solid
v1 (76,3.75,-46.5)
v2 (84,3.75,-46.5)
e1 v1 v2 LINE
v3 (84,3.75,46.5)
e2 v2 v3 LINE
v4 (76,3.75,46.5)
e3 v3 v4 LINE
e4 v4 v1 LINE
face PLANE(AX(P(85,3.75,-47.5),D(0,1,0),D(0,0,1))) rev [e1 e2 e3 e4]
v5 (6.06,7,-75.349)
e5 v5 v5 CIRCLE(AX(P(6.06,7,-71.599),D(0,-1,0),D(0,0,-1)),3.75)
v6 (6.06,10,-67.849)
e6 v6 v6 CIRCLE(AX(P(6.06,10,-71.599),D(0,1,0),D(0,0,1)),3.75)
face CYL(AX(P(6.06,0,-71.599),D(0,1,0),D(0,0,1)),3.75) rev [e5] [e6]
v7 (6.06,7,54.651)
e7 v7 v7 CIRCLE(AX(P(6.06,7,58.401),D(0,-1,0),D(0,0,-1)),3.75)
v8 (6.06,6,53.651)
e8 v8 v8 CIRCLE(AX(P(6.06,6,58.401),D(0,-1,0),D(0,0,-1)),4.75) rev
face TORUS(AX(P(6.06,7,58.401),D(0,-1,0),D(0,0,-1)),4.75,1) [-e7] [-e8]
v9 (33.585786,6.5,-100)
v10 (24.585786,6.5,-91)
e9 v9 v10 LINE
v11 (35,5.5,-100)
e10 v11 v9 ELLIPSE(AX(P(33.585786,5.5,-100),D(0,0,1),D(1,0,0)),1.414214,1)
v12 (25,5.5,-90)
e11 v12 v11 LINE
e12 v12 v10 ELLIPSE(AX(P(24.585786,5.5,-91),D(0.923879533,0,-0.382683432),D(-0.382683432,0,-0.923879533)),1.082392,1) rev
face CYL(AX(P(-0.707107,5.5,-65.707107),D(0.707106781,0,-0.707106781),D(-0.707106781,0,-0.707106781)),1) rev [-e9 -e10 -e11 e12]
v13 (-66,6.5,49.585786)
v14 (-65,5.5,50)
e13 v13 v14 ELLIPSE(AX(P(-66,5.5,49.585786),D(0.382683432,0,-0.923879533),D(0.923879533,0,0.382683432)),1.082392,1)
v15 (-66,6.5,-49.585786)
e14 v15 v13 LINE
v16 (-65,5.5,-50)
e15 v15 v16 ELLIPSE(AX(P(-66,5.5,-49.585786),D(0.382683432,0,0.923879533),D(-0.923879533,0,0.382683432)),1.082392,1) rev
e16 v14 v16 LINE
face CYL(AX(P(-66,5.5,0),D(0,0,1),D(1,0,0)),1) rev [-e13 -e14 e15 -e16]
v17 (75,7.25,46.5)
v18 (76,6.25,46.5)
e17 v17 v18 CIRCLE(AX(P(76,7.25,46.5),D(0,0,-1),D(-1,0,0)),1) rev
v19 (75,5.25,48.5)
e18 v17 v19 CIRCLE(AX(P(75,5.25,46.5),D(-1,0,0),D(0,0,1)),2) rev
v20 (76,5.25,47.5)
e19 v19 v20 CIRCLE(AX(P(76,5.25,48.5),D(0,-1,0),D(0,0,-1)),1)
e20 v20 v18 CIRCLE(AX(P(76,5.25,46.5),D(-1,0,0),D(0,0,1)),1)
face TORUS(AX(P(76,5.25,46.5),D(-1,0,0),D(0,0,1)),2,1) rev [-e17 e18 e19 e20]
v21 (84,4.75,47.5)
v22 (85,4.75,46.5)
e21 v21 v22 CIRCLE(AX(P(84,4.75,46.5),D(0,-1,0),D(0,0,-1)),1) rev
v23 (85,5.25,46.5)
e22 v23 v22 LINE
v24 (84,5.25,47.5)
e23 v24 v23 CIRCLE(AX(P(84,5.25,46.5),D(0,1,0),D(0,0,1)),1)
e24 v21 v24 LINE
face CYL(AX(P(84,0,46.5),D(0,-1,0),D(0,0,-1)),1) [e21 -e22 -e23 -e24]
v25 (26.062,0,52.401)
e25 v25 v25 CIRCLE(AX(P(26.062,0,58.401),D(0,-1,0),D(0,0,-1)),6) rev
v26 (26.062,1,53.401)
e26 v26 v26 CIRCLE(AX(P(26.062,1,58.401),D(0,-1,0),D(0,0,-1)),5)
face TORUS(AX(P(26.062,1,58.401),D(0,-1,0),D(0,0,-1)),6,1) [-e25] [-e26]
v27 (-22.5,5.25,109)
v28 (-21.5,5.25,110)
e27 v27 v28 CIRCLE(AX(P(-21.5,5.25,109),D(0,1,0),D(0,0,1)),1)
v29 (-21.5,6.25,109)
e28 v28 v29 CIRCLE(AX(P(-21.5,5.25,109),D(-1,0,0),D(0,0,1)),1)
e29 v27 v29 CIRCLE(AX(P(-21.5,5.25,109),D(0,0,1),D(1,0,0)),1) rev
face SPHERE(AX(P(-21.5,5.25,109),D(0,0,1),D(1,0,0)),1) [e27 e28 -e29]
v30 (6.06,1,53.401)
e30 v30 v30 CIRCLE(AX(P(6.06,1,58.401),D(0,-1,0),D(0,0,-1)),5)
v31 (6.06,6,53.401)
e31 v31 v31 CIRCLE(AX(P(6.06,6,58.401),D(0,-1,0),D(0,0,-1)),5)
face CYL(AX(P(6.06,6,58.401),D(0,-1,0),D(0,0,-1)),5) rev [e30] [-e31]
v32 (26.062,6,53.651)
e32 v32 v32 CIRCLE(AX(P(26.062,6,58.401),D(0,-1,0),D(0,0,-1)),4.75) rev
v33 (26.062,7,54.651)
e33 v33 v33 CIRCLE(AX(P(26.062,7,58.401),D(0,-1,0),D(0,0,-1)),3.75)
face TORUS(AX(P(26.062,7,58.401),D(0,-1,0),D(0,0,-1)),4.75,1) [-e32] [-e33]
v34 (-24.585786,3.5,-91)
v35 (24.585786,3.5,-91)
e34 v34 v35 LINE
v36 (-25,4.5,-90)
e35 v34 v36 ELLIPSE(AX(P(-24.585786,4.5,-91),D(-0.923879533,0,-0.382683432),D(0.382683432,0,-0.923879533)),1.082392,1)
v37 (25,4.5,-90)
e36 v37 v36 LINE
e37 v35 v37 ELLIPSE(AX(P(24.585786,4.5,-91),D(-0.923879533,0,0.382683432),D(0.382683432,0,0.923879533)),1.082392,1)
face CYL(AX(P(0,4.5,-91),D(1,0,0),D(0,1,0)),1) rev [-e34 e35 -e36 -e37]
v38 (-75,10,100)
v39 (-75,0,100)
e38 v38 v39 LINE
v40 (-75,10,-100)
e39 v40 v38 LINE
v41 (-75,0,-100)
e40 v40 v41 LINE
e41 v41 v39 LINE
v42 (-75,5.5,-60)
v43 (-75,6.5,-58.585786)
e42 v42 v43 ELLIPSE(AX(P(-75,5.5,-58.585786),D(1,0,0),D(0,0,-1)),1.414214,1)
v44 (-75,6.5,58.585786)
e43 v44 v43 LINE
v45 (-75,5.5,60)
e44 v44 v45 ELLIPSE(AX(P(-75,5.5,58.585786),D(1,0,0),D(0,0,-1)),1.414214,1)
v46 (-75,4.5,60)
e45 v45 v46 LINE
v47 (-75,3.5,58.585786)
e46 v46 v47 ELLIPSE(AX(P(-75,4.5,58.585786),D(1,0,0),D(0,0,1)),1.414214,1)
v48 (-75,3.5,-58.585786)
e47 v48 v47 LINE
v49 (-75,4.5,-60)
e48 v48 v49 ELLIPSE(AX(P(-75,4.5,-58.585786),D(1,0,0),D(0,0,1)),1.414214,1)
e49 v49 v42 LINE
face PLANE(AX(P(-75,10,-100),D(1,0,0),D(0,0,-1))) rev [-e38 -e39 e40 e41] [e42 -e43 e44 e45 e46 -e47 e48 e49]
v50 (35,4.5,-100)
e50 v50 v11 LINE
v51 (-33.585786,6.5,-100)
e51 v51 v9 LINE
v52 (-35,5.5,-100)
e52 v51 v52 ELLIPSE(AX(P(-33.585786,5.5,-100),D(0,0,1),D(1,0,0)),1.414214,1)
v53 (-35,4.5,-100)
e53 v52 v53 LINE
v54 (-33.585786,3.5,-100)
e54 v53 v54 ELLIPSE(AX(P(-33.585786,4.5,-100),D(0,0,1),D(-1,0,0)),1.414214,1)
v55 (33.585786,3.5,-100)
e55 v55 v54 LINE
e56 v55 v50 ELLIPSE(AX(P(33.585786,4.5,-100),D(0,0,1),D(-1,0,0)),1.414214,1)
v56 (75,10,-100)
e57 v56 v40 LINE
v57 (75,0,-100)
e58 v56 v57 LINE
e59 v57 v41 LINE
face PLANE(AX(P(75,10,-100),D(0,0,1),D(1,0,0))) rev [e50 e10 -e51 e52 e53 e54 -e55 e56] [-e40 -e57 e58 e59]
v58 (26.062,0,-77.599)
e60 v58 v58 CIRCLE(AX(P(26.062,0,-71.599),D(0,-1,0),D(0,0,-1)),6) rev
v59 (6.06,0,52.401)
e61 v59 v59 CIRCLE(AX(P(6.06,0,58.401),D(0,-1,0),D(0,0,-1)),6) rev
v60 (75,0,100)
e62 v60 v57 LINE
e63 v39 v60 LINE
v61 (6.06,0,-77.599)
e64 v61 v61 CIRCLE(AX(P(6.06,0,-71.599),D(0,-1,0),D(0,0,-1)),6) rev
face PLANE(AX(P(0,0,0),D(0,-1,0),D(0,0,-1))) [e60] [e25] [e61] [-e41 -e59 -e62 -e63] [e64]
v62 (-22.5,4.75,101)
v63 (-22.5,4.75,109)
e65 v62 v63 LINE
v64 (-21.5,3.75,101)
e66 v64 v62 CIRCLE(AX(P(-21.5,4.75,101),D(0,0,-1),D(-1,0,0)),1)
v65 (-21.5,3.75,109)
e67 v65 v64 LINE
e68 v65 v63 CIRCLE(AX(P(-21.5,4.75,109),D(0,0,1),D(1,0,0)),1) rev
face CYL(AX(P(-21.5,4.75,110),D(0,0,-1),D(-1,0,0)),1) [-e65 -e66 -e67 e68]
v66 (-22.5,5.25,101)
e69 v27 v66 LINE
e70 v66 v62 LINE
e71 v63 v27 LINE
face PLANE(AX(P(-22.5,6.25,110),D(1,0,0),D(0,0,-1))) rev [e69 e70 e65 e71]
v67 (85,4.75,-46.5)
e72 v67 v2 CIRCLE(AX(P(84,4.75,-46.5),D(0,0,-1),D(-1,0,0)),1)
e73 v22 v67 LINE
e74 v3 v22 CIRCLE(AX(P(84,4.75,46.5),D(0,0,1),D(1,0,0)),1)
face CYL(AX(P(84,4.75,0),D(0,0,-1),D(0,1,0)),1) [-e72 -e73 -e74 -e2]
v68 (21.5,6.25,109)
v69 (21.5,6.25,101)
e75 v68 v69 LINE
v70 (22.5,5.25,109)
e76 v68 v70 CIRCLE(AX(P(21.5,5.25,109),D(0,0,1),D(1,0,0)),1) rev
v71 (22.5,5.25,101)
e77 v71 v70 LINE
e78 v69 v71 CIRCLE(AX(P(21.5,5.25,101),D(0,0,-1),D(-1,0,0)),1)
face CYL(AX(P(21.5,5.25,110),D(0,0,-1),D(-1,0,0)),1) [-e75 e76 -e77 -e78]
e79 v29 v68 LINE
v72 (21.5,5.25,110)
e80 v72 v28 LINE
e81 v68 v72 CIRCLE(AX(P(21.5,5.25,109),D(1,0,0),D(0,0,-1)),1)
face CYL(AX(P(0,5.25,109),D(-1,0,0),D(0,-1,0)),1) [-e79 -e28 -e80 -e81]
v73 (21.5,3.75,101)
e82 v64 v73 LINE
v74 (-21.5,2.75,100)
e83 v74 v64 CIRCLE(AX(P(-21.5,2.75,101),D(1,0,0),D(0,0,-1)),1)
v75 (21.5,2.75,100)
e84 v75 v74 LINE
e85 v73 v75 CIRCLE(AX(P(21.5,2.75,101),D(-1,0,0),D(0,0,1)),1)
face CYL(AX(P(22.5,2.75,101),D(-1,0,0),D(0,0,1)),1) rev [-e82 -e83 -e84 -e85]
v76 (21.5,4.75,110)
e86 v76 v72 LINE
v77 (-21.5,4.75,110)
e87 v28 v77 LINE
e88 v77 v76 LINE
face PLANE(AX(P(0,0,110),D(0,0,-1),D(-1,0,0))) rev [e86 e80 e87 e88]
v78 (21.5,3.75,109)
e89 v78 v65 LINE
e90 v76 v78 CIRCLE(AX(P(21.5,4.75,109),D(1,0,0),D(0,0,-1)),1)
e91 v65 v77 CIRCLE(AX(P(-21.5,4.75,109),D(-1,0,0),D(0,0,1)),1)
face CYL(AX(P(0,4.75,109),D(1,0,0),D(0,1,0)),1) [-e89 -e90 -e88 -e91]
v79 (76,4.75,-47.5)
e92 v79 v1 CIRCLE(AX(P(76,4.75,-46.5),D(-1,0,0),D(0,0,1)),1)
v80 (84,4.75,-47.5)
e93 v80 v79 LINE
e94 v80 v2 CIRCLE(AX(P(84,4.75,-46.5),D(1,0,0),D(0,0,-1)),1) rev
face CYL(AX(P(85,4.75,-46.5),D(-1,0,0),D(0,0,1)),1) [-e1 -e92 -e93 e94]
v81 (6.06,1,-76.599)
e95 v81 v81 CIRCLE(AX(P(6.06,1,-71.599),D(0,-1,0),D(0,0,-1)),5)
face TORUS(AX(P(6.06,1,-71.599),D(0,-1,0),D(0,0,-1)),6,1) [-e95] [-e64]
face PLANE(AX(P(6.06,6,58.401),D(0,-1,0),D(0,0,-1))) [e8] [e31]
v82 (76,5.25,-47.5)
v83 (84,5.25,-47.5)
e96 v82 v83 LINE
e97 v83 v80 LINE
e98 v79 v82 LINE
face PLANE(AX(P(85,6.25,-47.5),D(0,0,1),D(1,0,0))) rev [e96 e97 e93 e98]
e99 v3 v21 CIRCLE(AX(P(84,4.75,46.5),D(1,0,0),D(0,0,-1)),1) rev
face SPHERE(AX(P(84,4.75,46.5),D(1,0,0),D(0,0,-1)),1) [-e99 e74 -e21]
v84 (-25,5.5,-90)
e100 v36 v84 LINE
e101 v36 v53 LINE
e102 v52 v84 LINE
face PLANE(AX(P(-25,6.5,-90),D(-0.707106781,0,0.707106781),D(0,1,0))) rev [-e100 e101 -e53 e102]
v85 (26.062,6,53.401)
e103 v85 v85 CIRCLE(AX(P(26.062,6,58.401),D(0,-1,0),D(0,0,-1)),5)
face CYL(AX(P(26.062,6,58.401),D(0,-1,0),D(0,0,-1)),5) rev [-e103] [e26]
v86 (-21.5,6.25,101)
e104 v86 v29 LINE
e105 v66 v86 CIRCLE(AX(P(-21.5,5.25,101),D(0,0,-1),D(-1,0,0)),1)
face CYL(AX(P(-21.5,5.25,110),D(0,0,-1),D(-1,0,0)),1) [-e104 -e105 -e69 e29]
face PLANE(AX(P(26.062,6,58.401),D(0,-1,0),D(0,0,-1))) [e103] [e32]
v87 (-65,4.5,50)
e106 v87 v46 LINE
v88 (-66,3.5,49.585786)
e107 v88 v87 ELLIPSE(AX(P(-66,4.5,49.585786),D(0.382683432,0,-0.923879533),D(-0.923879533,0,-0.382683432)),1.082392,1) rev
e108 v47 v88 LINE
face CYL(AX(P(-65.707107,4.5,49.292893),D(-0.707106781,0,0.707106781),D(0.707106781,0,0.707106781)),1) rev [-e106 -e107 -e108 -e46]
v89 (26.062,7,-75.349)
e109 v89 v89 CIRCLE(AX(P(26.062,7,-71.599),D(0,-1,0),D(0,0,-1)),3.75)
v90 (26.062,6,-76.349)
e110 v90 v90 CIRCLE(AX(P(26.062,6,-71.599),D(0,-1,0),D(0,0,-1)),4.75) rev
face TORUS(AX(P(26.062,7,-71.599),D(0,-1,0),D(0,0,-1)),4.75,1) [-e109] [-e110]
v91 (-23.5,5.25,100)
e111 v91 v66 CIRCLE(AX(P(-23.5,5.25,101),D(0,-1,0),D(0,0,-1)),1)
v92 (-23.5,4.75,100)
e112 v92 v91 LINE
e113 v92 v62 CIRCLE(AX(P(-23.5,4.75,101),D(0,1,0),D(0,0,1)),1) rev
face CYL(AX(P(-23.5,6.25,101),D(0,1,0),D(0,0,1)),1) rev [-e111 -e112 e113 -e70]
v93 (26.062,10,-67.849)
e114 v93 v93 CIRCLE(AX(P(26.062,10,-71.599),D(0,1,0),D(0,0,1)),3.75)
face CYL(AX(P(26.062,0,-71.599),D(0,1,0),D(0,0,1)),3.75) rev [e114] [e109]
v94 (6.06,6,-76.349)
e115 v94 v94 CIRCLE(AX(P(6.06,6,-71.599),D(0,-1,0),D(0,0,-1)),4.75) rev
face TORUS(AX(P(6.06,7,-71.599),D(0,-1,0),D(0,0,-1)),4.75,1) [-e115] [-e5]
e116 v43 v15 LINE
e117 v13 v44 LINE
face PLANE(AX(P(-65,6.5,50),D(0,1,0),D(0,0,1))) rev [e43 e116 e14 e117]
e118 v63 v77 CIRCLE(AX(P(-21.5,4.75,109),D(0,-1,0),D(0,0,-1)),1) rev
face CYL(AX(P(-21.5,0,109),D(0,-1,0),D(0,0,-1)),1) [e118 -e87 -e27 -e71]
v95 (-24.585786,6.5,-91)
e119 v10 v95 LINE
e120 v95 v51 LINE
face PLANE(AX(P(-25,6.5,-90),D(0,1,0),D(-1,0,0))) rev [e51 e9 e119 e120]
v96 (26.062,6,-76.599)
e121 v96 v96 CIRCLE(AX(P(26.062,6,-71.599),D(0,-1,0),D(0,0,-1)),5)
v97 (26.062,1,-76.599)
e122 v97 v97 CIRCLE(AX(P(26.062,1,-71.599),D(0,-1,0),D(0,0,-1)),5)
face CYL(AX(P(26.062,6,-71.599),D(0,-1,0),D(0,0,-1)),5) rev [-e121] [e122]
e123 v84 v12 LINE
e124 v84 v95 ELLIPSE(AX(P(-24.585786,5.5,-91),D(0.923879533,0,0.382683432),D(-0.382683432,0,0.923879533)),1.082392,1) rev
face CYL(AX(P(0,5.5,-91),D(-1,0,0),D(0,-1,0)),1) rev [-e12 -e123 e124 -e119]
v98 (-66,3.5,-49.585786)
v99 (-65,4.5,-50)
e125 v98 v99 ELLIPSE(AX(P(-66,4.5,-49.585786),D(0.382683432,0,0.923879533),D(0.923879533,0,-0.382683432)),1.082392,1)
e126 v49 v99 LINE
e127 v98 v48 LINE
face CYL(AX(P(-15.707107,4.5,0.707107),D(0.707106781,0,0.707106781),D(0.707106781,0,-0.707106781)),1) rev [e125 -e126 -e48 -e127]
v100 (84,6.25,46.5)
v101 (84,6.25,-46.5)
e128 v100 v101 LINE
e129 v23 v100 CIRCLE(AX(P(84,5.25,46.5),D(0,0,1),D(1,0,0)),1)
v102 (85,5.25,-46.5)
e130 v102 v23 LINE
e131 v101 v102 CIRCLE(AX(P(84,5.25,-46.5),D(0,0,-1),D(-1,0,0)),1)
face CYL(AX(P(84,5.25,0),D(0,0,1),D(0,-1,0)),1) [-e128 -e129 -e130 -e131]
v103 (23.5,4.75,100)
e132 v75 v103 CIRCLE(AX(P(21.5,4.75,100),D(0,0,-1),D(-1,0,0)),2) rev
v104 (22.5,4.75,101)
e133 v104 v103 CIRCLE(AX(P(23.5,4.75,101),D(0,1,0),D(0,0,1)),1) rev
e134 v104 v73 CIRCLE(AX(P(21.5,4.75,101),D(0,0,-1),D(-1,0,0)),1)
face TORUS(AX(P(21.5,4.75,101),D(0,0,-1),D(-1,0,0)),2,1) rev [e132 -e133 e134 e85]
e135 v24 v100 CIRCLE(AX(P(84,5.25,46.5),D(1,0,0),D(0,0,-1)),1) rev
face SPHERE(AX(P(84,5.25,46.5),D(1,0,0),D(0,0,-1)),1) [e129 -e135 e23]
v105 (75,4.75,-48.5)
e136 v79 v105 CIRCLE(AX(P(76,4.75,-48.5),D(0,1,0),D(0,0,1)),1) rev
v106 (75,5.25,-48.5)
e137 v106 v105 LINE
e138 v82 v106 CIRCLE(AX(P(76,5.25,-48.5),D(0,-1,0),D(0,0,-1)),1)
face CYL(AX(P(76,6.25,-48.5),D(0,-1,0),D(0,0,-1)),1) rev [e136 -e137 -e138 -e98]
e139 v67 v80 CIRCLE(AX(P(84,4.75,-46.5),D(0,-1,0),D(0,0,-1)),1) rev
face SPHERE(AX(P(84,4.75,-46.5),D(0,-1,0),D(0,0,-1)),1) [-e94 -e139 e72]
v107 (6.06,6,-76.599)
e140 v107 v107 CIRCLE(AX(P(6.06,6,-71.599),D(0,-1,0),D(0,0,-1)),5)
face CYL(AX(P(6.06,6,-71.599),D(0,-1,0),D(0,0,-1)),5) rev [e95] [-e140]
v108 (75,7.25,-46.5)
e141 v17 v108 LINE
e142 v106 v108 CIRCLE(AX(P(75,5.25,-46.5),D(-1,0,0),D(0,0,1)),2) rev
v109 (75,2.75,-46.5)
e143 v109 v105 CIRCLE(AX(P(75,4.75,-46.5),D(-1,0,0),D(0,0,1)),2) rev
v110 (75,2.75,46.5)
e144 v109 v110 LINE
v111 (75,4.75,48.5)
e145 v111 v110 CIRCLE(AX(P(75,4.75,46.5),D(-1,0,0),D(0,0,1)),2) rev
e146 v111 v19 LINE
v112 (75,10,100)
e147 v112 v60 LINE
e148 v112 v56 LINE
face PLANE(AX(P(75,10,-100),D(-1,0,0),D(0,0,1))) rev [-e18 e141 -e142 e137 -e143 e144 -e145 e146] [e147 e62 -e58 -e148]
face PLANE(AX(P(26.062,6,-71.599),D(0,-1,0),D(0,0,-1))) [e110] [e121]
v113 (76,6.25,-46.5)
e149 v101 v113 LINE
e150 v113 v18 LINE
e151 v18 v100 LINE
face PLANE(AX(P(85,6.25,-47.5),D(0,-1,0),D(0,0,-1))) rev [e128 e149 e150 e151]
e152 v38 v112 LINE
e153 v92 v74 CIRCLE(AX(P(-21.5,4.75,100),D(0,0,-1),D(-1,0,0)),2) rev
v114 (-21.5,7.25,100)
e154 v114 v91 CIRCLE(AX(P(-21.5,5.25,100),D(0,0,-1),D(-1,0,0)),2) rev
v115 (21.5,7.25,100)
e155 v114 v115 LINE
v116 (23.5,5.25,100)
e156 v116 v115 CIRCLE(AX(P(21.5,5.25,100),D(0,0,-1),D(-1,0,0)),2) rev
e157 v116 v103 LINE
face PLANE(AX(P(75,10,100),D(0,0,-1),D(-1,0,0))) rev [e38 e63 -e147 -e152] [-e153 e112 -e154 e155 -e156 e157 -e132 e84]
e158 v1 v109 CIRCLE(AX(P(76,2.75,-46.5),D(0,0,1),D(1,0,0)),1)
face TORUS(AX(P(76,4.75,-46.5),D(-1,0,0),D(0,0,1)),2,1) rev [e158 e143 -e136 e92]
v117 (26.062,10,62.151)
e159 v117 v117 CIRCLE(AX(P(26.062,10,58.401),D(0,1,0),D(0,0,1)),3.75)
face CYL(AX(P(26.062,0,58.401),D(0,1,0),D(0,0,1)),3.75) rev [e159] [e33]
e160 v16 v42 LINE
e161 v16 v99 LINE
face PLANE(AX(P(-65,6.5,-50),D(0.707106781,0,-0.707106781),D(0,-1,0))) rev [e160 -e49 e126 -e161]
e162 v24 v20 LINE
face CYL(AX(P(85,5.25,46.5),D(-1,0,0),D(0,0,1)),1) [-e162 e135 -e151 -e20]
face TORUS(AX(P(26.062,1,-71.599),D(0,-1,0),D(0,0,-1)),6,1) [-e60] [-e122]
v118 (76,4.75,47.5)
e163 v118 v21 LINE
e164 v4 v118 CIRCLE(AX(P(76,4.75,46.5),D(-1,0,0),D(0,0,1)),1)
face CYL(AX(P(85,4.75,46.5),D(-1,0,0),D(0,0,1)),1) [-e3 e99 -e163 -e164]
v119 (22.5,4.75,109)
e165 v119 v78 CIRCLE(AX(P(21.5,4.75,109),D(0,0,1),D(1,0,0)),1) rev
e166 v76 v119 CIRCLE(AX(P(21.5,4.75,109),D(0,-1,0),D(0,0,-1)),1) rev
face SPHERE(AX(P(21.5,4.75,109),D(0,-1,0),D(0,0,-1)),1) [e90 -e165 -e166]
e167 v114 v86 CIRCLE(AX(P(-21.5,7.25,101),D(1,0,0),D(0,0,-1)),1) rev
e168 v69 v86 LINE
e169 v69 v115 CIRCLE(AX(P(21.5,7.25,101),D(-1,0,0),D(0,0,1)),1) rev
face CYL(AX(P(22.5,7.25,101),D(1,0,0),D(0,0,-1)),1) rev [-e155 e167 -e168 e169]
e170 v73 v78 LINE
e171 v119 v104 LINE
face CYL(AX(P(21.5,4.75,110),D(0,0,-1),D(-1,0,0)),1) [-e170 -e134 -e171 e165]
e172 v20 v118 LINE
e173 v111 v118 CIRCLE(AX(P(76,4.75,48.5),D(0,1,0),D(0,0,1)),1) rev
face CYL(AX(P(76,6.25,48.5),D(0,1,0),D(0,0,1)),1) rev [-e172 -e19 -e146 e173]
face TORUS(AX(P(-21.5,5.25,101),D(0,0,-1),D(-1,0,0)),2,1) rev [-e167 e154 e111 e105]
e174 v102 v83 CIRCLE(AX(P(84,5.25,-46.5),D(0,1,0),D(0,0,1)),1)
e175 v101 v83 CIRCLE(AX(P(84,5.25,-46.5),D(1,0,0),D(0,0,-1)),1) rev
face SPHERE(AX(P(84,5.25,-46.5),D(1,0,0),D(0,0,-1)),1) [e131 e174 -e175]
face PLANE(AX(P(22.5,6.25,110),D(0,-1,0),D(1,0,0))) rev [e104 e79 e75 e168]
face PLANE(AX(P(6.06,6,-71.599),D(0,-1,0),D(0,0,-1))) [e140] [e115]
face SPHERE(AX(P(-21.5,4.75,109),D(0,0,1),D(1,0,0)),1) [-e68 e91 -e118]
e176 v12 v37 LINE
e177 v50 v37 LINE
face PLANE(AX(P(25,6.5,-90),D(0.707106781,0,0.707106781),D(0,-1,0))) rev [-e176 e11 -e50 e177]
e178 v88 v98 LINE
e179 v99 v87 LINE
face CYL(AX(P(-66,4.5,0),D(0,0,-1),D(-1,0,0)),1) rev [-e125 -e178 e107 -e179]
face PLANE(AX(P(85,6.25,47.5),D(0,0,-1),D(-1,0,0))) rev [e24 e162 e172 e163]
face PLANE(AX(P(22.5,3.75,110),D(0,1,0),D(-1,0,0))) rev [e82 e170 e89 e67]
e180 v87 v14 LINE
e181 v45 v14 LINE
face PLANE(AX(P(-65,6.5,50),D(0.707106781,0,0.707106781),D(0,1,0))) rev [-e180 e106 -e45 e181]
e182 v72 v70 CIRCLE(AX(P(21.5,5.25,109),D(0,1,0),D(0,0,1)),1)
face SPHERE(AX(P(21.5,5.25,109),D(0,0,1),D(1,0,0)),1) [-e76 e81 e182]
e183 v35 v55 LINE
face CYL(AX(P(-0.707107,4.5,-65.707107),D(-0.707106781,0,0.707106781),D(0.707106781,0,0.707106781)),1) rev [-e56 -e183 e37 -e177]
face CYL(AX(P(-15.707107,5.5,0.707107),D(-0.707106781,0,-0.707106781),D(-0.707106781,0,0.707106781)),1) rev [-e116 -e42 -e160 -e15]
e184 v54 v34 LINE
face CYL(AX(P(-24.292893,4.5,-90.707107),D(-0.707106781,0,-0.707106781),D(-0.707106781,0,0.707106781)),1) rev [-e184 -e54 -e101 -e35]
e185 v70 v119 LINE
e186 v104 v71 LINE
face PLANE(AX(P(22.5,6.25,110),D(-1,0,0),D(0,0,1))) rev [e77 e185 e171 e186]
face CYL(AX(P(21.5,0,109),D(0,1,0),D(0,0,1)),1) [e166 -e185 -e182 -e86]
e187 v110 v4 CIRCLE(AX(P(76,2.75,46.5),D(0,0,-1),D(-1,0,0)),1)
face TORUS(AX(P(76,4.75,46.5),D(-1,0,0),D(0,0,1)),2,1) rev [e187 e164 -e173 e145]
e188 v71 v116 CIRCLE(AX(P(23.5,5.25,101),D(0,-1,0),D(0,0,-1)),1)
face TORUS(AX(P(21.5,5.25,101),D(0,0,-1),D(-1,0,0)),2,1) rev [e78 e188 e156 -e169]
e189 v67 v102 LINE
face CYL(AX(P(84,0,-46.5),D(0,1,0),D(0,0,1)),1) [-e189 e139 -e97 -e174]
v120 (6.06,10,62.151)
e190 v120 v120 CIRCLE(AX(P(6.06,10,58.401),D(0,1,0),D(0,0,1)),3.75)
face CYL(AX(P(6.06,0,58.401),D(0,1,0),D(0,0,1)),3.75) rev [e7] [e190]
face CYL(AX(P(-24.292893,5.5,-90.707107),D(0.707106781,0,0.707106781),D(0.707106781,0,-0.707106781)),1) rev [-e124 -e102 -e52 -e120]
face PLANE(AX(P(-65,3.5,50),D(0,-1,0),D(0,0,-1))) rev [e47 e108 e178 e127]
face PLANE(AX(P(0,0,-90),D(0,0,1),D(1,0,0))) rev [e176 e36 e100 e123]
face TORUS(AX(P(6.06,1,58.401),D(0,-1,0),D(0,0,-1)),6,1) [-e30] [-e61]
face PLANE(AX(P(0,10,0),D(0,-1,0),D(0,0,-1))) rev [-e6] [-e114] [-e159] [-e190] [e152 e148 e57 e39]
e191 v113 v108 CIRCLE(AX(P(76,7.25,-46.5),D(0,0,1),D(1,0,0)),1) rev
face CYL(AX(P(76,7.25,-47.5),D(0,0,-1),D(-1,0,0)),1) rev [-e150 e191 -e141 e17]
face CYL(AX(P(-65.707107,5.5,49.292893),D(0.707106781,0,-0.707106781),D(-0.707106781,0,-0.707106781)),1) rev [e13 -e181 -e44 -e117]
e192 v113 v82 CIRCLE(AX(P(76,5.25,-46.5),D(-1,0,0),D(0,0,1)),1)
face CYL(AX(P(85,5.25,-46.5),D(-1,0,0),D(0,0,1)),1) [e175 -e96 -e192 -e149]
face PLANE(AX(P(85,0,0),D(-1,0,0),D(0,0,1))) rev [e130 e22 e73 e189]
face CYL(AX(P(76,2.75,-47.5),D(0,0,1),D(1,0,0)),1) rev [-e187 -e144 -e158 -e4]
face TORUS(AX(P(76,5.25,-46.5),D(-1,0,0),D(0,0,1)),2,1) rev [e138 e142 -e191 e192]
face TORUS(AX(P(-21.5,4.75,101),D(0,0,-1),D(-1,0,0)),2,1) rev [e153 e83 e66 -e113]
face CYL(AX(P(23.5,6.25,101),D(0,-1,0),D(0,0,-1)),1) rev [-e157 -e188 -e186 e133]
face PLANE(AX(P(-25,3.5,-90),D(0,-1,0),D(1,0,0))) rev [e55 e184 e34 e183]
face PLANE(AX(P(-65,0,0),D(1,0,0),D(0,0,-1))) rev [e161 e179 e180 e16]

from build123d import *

# Parameters (mm, degrees)
SKETCH1_W           = 150
SKETCH1_H           = 200
BOSS_EXTRUDE1_DEPTH = 10
SKETCH2_W           = 100
SKETCH2_H           = 3
CUT_EXTRUDE1_DEPTH  = 10
CHAMFER1_SIZE       = 10
SKETCH3_W           = 50
SKETCH3_H           = 3
CUT_EXTRUDE2_DEPTH  = 10
CHAMFER2_SIZE       = 10
FILLET1_R           = 1
SKETCH4_W           = 45
SKETCH4_H           = 2.5
BOSS_EXTRUDE2_DEPTH = 10
SKETCH5_W           = 95
SKETCH5_H           = 2.5
BOSS_EXTRUDE3_DEPTH = 10
FILLET2_R           = 1
SKETCH6_R           = 3.75
CUT_EXTRUDE3_DEPTH  = 10
SKETCH7_R           = 5
CUT_EXTRUDE4_DEPTH  = 6
FILLET3_R           = 1


# Some blends are built 0.0001 mm under size
with BuildPart() as part:
    # Sketch1 → Boss-Extrude1 (new body)
    with BuildSketch(Plane(origin=(0, 0, 0), x_dir=(1, 0, 0), z_dir=(0, 1, 0))):
        Rectangle(SKETCH1_W, SKETCH1_H)
    extrude(amount=BOSS_EXTRUDE1_DEPTH)

    # Sketch2 → Cut-Extrude1 (cut)
    with BuildSketch(Plane.ZY.offset(75)):
        with Locations((0, 5)):
            Rectangle(SKETCH2_W, SKETCH2_H)
    extrude(amount=-CUT_EXTRUDE1_DEPTH, mode=Mode.SUBTRACT)

    # Chamfer1
    chamfer1_edges = [part.edges().sort_by_distance(p)[0] for p in [
        (-75, 5, 50),
        (-75, 5, -50),
    ]]
    chamfer(chamfer1_edges, length=CHAMFER1_SIZE - 0.0001)  # a hair under: the kernel refuses the full size

    # Sketch3 → Cut-Extrude2 (cut)
    with BuildSketch(Plane(origin=(0, 0, -100), x_dir=(-1, 0, 0), z_dir=(0, 0, -1))):
        with Locations((0, 5)):
            Rectangle(SKETCH3_W, SKETCH3_H)
    extrude(amount=-CUT_EXTRUDE2_DEPTH, mode=Mode.SUBTRACT)

    # Chamfer2
    chamfer2_edges = [part.edges().sort_by_distance(p)[0] for p in [
        (-25, 5, -100),
        (25, 5, -100),
    ]]
    chamfer(chamfer2_edges, length=CHAMFER2_SIZE - 0.0001)  # a hair under: the kernel refuses the full size

    # Fillet1
    # the kernel refuses this fillet: 1 mm, written as the material it adds along each edge
    with BuildSketch(Plane(origin=(-65, 6.5, 52.5), x_dir=(0, -1, 0), z_dir=(0, 0, -1)), Plane(origin=(-65, 3.5, -52.5), x_dir=(0, 1, 0), z_dir=(0, 0, 1))) as fillet1_piece_1:
        with BuildLine():
            CenterArc((FILLET1_R, FILLET1_R), FILLET1_R, 180, 90)
            Line((0, FILLET1_R), (0, 0))
            Line((0, 0), (FILLET1_R, 0))
        make_face()
    extrude(amount=105)
    with BuildSketch(Plane(origin=(-76.767766953, 6.5, 61.767666953), x_dir=(-0.7071067811865476, 0, -0.7071067811865476), z_dir=(0.7071067811865476, 0, -0.7071067811865476))) as fillet1_piece_2_section:
        with BuildLine():
            CenterArc((FILLET1_R, -FILLET1_R), FILLET1_R, 90, 90)
            Line((0, -FILLET1_R), (0, 0))
            Line((0, 0), (FILLET1_R, 0))
        make_face()
    fillet1_piece_2 = extrude(amount=19.141994202, mode=Mode.PRIVATE)
    fillet1_piece_2 = split(fillet1_piece_2, bisect_by=Plane(origin=(-75, 6.269593446, 54.844665919), z_dir=(1, 0, 0)), keep=Keep.TOP, mode=Mode.PRIVATE)
    add(fillet1_piece_2)
    with BuildSketch(Plane(origin=(-76.767766953, 3.5, 61.767666953), x_dir=(0, 1, 0), z_dir=(0.7071067811865476, 0, -0.7071067811865476))) as fillet1_piece_3_section:
        with BuildLine():
            CenterArc((FILLET1_R, -FILLET1_R), FILLET1_R, 90, 90)
            Line((0, -FILLET1_R), (0, 0))
            Line((0, 0), (FILLET1_R, 0))
        make_face()
    fillet1_piece_3 = extrude(amount=19.141994202, mode=Mode.PRIVATE)
    fillet1_piece_3 = split(fillet1_piece_3, bisect_by=Plane(origin=(-75, 3.730406554, 54.844665919), z_dir=(1, 0, 0)), keep=Keep.TOP, mode=Mode.PRIVATE)
    add(fillet1_piece_3)
    with BuildSketch(Plane(origin=(-76.767766953, 3.5, -61.767666953), x_dir=(0, 1, 0), z_dir=(0.7071067811865476, 0, 0.7071067811865476))) as fillet1_piece_4_section:
        with BuildLine():
            CenterArc((FILLET1_R, FILLET1_R), FILLET1_R, 180, 90)
            Line((0, FILLET1_R), (0, 0))
            Line((0, 0), (FILLET1_R, 0))
        make_face()
    fillet1_piece_4 = extrude(amount=19.141994202, mode=Mode.PRIVATE)
    fillet1_piece_4 = split(fillet1_piece_4, bisect_by=Plane(origin=(-75, 3.730406554, -54.844665919), z_dir=(1, 0, 0)), keep=Keep.TOP, mode=Mode.PRIVATE)
    add(fillet1_piece_4)
    with BuildSketch(Plane(origin=(-76.767766953, 6.5, -61.767666953), x_dir=(0, -1, 0), z_dir=(0.7071067811865476, 0, 0.7071067811865476))) as fillet1_piece_5_section:
        with BuildLine():
            CenterArc((FILLET1_R, -FILLET1_R), FILLET1_R, 90, 90)
            Line((0, -FILLET1_R), (0, 0))
            Line((0, 0), (FILLET1_R, 0))
        make_face()
    fillet1_piece_5 = extrude(amount=19.141994202, mode=Mode.PRIVATE)
    fillet1_piece_5 = split(fillet1_piece_5, bisect_by=Plane(origin=(-75, 6.269593446, -54.844665919), z_dir=(1, 0, 0)), keep=Keep.TOP, mode=Mode.PRIVATE)
    add(fillet1_piece_5)
    with BuildSketch(Plane(origin=(-27.5, 6.5, -90), x_dir=(0, -1, 0), z_dir=(1, 0, 0)), Plane(origin=(27.5, 3.5, -90), x_dir=(0, 1, 0), z_dir=(-1, 0, 0))) as fillet1_piece_6:
        with BuildLine():
            CenterArc((FILLET1_R, FILLET1_R), FILLET1_R, 180, 90)
            Line((0, FILLET1_R), (0, 0))
            Line((0, 0), (FILLET1_R, 0))
        make_face()
    extrude(amount=55)
    with BuildSketch(Plane(origin=(-36.767666953, 6.5, -101.767766953), x_dir=(0.7071067811865475, 0, -0.7071067811865477), z_dir=(0.7071067811865477, 0, 0.7071067811865474))) as fillet1_piece_7_section:
        with BuildLine():
            CenterArc((FILLET1_R, -FILLET1_R), FILLET1_R, 90, 90)
            Line((0, -FILLET1_R), (0, 0))
            Line((0, 0), (FILLET1_R, 0))
        make_face()
    fillet1_piece_7 = extrude(amount=19.141994202, mode=Mode.PRIVATE)
    fillet1_piece_7 = split(fillet1_piece_7, bisect_by=Plane(origin=(-29.844665919, 6.269593446, -100), z_dir=(0, 0, 1)), keep=Keep.TOP, mode=Mode.PRIVATE)
    add(fillet1_piece_7)
    with BuildSketch(Plane(origin=(-36.767666953, 3.5, -101.767766953), x_dir=(0, 1, 0), z_dir=(0.7071067811865477, 0, 0.7071067811865474))) as fillet1_piece_8_section:
        with BuildLine():
            CenterArc((FILLET1_R, -FILLET1_R), FILLET1_R, 90, 90)
            Line((0, -FILLET1_R), (0, 0))
            Line((0, 0), (FILLET1_R, 0))
        make_face()
    fillet1_piece_8 = extrude(amount=19.141994202, mode=Mode.PRIVATE)
    fillet1_piece_8 = split(fillet1_piece_8, bisect_by=Plane(origin=(-29.844665919, 3.730406554, -100), z_dir=(0, 0, 1)), keep=Keep.TOP, mode=Mode.PRIVATE)
    add(fillet1_piece_8)
    with BuildSketch(Plane(origin=(36.767666953, 3.5, -101.767766953), x_dir=(0, 1, 0), z_dir=(-0.7071067811865474, 0, 0.7071067811865477))) as fillet1_piece_9_section:
        with BuildLine():
            CenterArc((FILLET1_R, FILLET1_R), FILLET1_R, 180, 90)
            Line((0, FILLET1_R), (0, 0))
            Line((0, 0), (FILLET1_R, 0))
        make_face()
    fillet1_piece_9 = extrude(amount=19.141994202, mode=Mode.PRIVATE)
    fillet1_piece_9 = split(fillet1_piece_9, bisect_by=Plane(origin=(29.844665919, 3.730406554, -100), z_dir=(0, 0, 1)), keep=Keep.TOP, mode=Mode.PRIVATE)
    add(fillet1_piece_9)
    with BuildSketch(Plane(origin=(36.767666953, 6.5, -101.767766953), x_dir=(0, -1, 0), z_dir=(-0.7071067811865474, 0, 0.7071067811865477))) as fillet1_piece_10_section:
        with BuildLine():
            CenterArc((FILLET1_R, -FILLET1_R), FILLET1_R, 90, 90)
            Line((0, -FILLET1_R), (0, 0))
            Line((0, 0), (FILLET1_R, 0))
        make_face()
    fillet1_piece_10 = extrude(amount=19.141994202, mode=Mode.PRIVATE)
    fillet1_piece_10 = split(fillet1_piece_10, bisect_by=Plane(origin=(29.844665919, 6.269593446, -100), z_dir=(0, 0, 1)), keep=Keep.TOP, mode=Mode.PRIVATE)
    add(fillet1_piece_10)

    # Sketch4 → Boss-Extrude2 (add)
    with BuildSketch(Plane.XY.offset(100)):
        with Locations((0, 5)):
            Rectangle(SKETCH4_W, SKETCH4_H)
    extrude(amount=BOSS_EXTRUDE2_DEPTH)

    # Sketch5 → Boss-Extrude3 (add)
    with BuildSketch(Plane(origin=(75, 0, 0), x_dir=(0, 0, -1), z_dir=(1, 0, 0))):
        with Locations((0, 5)):
            Rectangle(SKETCH5_W, SKETCH5_H)
    extrude(amount=BOSS_EXTRUDE3_DEPTH)

    # Fillet2
    fillet2_edges = [part.edges().sort_by_distance(p)[0] for p in [
        (-22.5, 5, 100),
        (-22.5, 6.25, 105),
        (0, 3.75, 100),
        (-22.5, 3.75, 105),
        (22.5, 5, 100),
        (22.5, 3.75, 105),
        (0, 6.25, 100),
        (22.5, 6.25, 105),
        (-22.5, 5, 110),
        (0, 3.75, 110),
        (22.5, 5, 110),
        (0, 6.25, 110),
        (75, 5, 47.5),
        (80, 6.25, 47.5),
        (75, 3.75, 0),
        (80, 3.75, 47.5),
        (75, 5, -47.5),
        (80, 3.75, -47.5),
        (75, 6.25, 0),
        (80, 6.25, -47.5),
        (85, 5, 47.5),
        (85, 3.75, 0),
        (85, 5, -47.5),
        (85, 6.25, 0),
    ]]
    fillet(fillet2_edges, radius=FILLET2_R)

    # Sketch6 → Cut-Extrude3 (cut)
    with BuildSketch(Plane(origin=(0, 10, 0), x_dir=(1, 0, 0), z_dir=(0, 1, 0))):
        with Locations(Location((26.062, 71.599, 0), (0, 0, 270))):
            Circle(SKETCH6_R)
        with Locations(Location((26.062, -58.401, 0), (0, 0, 270))):
            Circle(SKETCH6_R)
        with Locations(Location((6.06, 71.599, 0), (0, 0, 270))):
            Circle(SKETCH6_R)
        with Locations(Location((6.06, -58.401, 0), (0, 0, 270))):
            Circle(SKETCH6_R)
    extrude(amount=-CUT_EXTRUDE3_DEPTH, mode=Mode.SUBTRACT)

    # Sketch7 → Cut-Extrude4 (cut)
    with BuildSketch(Plane.XZ):
        with Locations(Location((6.06, -71.599, 0), (0, 0, 270))):
            Circle(SKETCH7_R)
        with Locations(Location((26.062, -71.599, 0), (0, 0, 270))):
            Circle(SKETCH7_R)
        with Locations(Location((26.062, 58.401, 0), (0, 0, 270))):
            Circle(SKETCH7_R)
        with Locations(Location((6.06, 58.401, 0), (0, 0, 270))):
            Circle(SKETCH7_R)
    extrude(amount=-CUT_EXTRUDE4_DEPTH, mode=Mode.SUBTRACT)

    # Fillet3
    fillet3_edges = [part.edges().sort_by_distance(p)[0] for p in [
        (6.06, 0, 63.401),
        (6.06, 6, 54.651),
        (26.062, 0, 63.401),
        (26.062, 6, 54.651),
        (26.062, 0, -66.599),
        (26.062, 6, -75.349),
        (6.06, 0, -66.599),
        (6.06, 6, -75.349),
    ]]
    fillet(fillet3_edges, radius=FILLET3_R)


solid = part.part
